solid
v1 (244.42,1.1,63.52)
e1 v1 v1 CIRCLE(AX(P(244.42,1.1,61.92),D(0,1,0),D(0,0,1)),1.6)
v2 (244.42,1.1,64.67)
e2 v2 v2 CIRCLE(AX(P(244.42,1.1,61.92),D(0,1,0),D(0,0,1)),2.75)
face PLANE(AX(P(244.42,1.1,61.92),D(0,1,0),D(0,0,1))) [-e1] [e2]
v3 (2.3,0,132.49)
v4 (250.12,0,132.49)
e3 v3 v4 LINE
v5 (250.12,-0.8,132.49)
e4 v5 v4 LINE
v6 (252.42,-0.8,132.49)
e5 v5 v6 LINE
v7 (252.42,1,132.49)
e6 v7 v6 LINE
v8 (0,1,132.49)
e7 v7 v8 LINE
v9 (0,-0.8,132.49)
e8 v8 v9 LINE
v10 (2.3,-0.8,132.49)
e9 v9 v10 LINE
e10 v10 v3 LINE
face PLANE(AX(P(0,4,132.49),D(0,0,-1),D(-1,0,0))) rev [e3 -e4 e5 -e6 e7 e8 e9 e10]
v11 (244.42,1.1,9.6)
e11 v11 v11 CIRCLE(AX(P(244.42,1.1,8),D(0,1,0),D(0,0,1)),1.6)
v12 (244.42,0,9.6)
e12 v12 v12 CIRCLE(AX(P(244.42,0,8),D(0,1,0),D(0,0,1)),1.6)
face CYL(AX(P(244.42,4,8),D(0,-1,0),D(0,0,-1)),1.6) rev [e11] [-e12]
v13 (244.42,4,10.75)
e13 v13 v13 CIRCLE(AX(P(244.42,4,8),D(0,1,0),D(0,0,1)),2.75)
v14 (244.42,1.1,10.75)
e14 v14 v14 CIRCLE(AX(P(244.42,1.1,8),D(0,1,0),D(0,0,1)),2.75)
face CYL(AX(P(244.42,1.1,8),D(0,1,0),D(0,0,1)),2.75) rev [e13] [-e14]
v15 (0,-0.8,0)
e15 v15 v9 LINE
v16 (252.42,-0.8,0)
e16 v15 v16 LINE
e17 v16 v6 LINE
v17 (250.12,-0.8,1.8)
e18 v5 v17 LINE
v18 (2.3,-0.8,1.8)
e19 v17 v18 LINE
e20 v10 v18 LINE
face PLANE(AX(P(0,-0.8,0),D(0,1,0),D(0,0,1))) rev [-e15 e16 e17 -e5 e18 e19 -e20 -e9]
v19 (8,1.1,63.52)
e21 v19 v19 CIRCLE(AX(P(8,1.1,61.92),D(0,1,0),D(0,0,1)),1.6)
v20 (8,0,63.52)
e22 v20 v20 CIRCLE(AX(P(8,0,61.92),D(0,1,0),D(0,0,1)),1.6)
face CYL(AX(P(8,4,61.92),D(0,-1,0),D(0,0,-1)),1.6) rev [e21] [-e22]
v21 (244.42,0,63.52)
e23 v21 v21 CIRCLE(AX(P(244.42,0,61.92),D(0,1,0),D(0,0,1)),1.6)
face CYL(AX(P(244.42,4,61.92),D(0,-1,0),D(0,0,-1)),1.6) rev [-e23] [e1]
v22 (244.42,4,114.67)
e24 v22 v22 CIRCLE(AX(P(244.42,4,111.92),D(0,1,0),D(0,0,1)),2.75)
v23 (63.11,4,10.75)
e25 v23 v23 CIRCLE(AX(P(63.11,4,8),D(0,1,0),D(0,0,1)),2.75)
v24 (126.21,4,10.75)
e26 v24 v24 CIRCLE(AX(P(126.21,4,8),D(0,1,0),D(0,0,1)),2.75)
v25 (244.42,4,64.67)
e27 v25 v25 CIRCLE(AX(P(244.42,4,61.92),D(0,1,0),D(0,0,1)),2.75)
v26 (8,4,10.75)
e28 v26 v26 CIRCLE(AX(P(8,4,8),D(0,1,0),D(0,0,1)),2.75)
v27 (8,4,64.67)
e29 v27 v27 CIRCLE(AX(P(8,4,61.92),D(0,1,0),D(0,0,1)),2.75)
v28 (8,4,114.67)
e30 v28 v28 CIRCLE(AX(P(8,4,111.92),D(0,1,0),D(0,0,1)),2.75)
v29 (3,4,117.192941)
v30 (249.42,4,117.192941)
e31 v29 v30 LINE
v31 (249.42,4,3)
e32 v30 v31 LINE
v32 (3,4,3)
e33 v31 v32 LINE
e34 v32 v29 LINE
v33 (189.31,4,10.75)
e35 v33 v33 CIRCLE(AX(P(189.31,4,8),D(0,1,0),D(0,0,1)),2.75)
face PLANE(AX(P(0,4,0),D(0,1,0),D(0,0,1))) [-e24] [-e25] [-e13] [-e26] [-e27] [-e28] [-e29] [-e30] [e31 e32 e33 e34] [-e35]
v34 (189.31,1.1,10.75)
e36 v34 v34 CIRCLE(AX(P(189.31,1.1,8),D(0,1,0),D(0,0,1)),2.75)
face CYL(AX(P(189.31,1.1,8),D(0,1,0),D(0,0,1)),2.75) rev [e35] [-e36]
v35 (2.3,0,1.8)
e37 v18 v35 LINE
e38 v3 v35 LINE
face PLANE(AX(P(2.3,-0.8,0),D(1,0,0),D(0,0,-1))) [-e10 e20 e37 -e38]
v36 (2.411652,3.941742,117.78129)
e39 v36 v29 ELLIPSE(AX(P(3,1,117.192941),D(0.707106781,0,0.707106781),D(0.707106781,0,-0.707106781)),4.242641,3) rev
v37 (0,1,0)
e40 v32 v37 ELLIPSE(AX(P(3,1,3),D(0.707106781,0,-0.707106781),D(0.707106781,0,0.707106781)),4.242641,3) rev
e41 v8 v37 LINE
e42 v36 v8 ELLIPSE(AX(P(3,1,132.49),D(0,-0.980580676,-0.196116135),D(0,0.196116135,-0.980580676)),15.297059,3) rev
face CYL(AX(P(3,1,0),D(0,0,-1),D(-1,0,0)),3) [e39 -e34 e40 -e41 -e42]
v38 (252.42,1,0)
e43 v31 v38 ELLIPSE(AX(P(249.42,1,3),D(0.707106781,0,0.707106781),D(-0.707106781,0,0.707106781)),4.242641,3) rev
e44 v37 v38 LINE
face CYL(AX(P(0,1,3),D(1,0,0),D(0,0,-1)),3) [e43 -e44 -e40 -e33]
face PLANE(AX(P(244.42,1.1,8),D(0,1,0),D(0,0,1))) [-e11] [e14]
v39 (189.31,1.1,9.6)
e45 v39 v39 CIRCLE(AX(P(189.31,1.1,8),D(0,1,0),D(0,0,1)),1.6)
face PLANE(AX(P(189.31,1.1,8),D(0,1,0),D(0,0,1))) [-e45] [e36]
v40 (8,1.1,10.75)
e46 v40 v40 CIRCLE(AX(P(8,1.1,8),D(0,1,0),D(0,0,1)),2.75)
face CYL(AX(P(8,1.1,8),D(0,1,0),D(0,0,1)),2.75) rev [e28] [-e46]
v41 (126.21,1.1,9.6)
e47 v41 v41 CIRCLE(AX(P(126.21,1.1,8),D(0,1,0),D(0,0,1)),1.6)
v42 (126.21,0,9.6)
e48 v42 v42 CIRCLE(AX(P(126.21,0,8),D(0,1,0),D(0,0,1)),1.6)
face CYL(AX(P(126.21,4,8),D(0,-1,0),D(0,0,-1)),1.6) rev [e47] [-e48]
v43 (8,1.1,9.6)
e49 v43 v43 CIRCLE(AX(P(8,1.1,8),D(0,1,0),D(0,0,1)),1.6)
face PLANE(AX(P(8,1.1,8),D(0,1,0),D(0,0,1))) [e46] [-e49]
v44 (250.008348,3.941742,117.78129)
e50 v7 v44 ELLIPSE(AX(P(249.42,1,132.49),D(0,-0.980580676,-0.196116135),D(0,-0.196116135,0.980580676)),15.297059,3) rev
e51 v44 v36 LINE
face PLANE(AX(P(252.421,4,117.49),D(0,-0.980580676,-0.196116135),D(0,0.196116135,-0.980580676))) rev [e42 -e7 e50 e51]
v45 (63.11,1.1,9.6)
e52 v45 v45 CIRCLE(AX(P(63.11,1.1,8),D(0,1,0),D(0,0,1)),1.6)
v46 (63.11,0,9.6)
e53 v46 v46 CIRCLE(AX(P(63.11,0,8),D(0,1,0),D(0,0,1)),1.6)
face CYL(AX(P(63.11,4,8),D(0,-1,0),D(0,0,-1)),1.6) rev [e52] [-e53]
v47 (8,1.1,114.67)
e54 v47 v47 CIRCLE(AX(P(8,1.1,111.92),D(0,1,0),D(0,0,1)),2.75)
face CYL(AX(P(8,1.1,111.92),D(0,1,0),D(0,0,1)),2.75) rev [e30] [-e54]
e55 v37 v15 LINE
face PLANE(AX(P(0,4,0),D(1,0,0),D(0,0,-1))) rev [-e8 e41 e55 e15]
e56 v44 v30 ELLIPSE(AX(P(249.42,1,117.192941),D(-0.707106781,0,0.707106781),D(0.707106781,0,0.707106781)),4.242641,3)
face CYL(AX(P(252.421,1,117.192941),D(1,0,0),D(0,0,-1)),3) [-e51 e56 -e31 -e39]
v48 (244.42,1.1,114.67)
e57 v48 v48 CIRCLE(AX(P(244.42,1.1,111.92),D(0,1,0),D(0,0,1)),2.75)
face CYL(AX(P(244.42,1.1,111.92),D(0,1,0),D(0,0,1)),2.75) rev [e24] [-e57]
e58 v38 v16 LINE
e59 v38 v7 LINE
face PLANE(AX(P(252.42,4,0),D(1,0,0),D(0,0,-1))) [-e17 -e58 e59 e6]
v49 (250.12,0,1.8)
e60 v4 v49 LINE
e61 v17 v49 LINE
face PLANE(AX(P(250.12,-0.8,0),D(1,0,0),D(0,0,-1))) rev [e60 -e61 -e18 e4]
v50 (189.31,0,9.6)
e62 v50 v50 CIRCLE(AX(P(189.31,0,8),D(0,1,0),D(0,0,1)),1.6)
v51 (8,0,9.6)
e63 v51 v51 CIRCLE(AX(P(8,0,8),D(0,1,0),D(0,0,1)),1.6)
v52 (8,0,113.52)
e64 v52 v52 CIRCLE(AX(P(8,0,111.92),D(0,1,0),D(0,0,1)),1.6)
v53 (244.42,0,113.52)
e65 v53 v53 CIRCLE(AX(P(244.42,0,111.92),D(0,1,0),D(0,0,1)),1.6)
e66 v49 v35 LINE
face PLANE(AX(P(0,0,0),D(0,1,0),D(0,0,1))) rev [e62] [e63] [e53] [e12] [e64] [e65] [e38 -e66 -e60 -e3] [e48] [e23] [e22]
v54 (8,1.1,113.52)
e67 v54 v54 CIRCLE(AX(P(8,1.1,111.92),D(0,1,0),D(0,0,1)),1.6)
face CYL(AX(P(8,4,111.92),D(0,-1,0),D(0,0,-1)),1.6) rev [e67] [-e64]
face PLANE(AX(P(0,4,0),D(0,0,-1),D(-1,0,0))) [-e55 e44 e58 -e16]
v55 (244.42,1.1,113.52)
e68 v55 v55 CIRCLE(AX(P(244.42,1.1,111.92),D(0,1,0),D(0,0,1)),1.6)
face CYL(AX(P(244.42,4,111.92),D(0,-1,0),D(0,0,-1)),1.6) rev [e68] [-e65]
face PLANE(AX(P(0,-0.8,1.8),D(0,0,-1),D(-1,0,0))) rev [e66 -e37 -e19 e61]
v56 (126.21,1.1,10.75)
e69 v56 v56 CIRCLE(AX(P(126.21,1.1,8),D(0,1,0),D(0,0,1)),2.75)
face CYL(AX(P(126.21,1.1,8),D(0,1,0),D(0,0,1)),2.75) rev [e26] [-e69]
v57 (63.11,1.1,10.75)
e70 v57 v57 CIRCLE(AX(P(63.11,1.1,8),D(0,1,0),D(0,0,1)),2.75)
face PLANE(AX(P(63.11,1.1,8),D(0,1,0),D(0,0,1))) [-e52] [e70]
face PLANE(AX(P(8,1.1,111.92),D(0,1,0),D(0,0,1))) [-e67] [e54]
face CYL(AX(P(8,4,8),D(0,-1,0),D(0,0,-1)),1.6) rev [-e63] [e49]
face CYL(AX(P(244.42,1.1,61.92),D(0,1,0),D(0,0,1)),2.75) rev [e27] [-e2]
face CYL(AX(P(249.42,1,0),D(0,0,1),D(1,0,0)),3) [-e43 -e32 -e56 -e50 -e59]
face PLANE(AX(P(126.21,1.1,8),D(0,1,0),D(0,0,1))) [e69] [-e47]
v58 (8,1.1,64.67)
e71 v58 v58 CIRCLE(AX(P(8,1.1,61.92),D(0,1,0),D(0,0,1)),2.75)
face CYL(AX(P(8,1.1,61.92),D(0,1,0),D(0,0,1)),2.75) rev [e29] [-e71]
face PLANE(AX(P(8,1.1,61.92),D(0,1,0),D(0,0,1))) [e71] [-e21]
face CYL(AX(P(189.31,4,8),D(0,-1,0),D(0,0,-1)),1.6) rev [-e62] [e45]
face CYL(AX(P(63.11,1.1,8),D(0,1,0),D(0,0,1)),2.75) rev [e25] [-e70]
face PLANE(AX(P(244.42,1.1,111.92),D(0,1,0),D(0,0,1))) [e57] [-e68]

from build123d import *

# Parameters (mm, degrees)
SKETCH1_W           = 247.82
SKETCH1_H           = 120.12
SKETCH1_R           = 1.6
SKETCH1_H_2         = 10.57
SKETCH1_H_3         = 1.8
BOSS_EXTRUDE1_DEPTH = 4
SKETCH1_5_W         = 247.82
SKETCH1_5_H         = 1.8
BOSS_EXTRUDE2_DEPTH = 0.8
SKETCH1_6_W         = 247.82
SKETCH1_6_H         = 10.57
BOSS_EXTRUDE3_DEPTH = 1.4
SKETCH2_R           = 2.75
CUT_EXTRUDE1_DEPTH  = 2.9
CUT_EXTRUDE2_REACH  = 287.106
FILLET1_R           = 3


with BuildPart() as part:
    # Sketch1 → Boss-Extrude1 (new body)
    # profile 1 of 5: a face of its own
    with BuildSketch(Plane(origin=(0, 0, 0), x_dir=(1, 0, 0), z_dir=(0, 1, 0))):
        with Locations((126.21, -61.86)):
            Rectangle(SKETCH1_W, SKETCH1_H)
        with Locations(Location((8, -111.92, 0), (0, 0, 270))):
            Circle(SKETCH1_R, mode=Mode.SUBTRACT)
        with Locations(Location((244.42, -111.92, 0), (0, 0, 270))):
            Circle(SKETCH1_R, mode=Mode.SUBTRACT)
        with Locations(Location((8, -61.92, 0), (0, 0, 270))):
            Circle(SKETCH1_R, mode=Mode.SUBTRACT)
        with Locations(Location((8, -8, 0), (0, 0, 270))):
            Circle(SKETCH1_R, mode=Mode.SUBTRACT)
        with Locations(Location((63.11, -8, 0), (0, 0, 270))):
            Circle(SKETCH1_R, mode=Mode.SUBTRACT)
        with Locations(Location((244.42, -61.92, 0), (0, 0, 270))):
            Circle(SKETCH1_R, mode=Mode.SUBTRACT)
        with Locations(Location((126.21, -8, 0), (0, 0, 270))):
            Circle(SKETCH1_R, mode=Mode.SUBTRACT)
        with Locations(Location((189.31, -8, 0), (0, 0, 270))):
            Circle(SKETCH1_R, mode=Mode.SUBTRACT)
        with Locations(Location((244.42, -8, 0), (0, 0, 270))):
            Circle(SKETCH1_R, mode=Mode.SUBTRACT)
    # profile 2 of 5: a face of its own
    with BuildSketch(Plane(origin=(0, 0, 0), x_dir=(1, 0, 0), z_dir=(0, 1, 0))):
        Polygon((252.42, 0), (250.12, 0), (250.12, -1.8), (250.12, -121.92), (250.12, -132.49), (252.42, -132.49), align=None)
    # profile 3 of 5: a face of its own
    with BuildSketch(Plane(origin=(0, 0, 0), x_dir=(1, 0, 0), z_dir=(0, 1, 0))):
        with Locations((126.21, -127.205)):
            Rectangle(SKETCH1_W, SKETCH1_H_2)
    # profile 4 of 5: a face of its own
    with BuildSketch(Plane(origin=(0, 0, 0), x_dir=(1, 0, 0), z_dir=(0, 1, 0))):
        Polygon((2.3, 0), (0, 0), (0, -132.49), (2.3, -132.49), (2.3, -121.92), (2.3, -1.8), align=None)
    # profile 5 of 5: a face of its own
    with BuildSketch(Plane(origin=(0, 0, 0), x_dir=(1, 0, 0), z_dir=(0, 1, 0))):
        with Locations((126.21, -0.9)):
            Rectangle(SKETCH1_W, SKETCH1_H_3)
    extrude(amount=BOSS_EXTRUDE1_DEPTH)

    # Sketch1<5> → Boss-Extrude2 (add)
    with BuildSketch(Plane(origin=(0, 0, 0), x_dir=(1, 0, 0), z_dir=(0, 1, 0))):
        Polygon((2.3, 0), (0, 0), (0, -132.49), (2.3, -132.49), (2.3, -121.92), (2.3, -1.8), align=None)
        with Locations((126.21, -0.9)):
            Rectangle(SKETCH1_5_W, SKETCH1_5_H)
        Polygon((252.42, 0), (250.12, 0), (250.12, -1.8), (250.12, -121.92), (250.12, -132.49), (252.42, -132.49), align=None)
    extrude(amount=-BOSS_EXTRUDE2_DEPTH)

    # Sketch1<6> → Boss-Extrude3 (add)
    with BuildSketch(Plane(origin=(0, 0, 0), x_dir=(1, 0, 0), z_dir=(0, 1, 0))):
        with Locations((126.21, -127.205)):
            Rectangle(SKETCH1_6_W, SKETCH1_6_H)
    extrude(amount=BOSS_EXTRUDE3_DEPTH)

    # Sketch2 → Cut-Extrude1 (cut)
    with BuildSketch(Plane(origin=(0, 4, 0), x_dir=(1, 0, 0), z_dir=(0, 1, 0))):
        with Locations(Location((8, -8, 0), (0, 0, 270))):
            Circle(SKETCH2_R)
        with Locations(Location((63.11, -8, 0), (0, 0, 270))):
            Circle(SKETCH2_R)
        with Locations(Location((126.21, -8, 0), (0, 0, 270))):
            Circle(SKETCH2_R)
        with Locations(Location((189.31, -8, 0), (0, 0, 270))):
            Circle(SKETCH2_R)
        with Locations(Location((244.42, -8, 0), (0, 0, 270))):
            Circle(SKETCH2_R)
        with Locations(Location((244.42, -61.92, 0), (0, 0, 270))):
            Circle(SKETCH2_R)
        with Locations(Location((244.42, -111.92, 0), (0, 0, 270))):
            Circle(SKETCH2_R)
        with Locations(Location((8, -111.92, 0), (0, 0, 270))):
            Circle(SKETCH2_R)
        with Locations(Location((8, -61.92, 0), (0, 0, 270))):
            Circle(SKETCH2_R)
    extrude(amount=-CUT_EXTRUDE1_DEPTH, mode=Mode.SUBTRACT)

    # Sketch3 → Cut-Extrude2 (cut, up to next)
    with BuildSketch(Plane.ZY, mode=Mode.PRIVATE) as cut_extrude2_sk1:
        Polygon((117.49, 4), (132.49, 1), (132.49, 4), align=None)
    cut_extrude2_tool1 = extrude(cut_extrude2_sk1.sketch, amount=-CUT_EXTRUDE2_REACH, mode=Mode.PRIVATE) & part.part
    add(cut_extrude2_tool1.solids().sort_by_distance((0, 3, 127.49))[0], mode=Mode.SUBTRACT)

    # Fillet1
    fillet1_edges = [part.edges().sort_by_distance(p)[0] for p in [
        (0, 4, 58.745),
        (126.21, 4, 0),
        (126.21, 4, 117.49),
        (252.42, 4, 58.745),
    ]]
    fillet(fillet1_edges, radius=FILLET1_R - 0.0001)  # a hair under: the kernel refuses the full size


solid = part.part
